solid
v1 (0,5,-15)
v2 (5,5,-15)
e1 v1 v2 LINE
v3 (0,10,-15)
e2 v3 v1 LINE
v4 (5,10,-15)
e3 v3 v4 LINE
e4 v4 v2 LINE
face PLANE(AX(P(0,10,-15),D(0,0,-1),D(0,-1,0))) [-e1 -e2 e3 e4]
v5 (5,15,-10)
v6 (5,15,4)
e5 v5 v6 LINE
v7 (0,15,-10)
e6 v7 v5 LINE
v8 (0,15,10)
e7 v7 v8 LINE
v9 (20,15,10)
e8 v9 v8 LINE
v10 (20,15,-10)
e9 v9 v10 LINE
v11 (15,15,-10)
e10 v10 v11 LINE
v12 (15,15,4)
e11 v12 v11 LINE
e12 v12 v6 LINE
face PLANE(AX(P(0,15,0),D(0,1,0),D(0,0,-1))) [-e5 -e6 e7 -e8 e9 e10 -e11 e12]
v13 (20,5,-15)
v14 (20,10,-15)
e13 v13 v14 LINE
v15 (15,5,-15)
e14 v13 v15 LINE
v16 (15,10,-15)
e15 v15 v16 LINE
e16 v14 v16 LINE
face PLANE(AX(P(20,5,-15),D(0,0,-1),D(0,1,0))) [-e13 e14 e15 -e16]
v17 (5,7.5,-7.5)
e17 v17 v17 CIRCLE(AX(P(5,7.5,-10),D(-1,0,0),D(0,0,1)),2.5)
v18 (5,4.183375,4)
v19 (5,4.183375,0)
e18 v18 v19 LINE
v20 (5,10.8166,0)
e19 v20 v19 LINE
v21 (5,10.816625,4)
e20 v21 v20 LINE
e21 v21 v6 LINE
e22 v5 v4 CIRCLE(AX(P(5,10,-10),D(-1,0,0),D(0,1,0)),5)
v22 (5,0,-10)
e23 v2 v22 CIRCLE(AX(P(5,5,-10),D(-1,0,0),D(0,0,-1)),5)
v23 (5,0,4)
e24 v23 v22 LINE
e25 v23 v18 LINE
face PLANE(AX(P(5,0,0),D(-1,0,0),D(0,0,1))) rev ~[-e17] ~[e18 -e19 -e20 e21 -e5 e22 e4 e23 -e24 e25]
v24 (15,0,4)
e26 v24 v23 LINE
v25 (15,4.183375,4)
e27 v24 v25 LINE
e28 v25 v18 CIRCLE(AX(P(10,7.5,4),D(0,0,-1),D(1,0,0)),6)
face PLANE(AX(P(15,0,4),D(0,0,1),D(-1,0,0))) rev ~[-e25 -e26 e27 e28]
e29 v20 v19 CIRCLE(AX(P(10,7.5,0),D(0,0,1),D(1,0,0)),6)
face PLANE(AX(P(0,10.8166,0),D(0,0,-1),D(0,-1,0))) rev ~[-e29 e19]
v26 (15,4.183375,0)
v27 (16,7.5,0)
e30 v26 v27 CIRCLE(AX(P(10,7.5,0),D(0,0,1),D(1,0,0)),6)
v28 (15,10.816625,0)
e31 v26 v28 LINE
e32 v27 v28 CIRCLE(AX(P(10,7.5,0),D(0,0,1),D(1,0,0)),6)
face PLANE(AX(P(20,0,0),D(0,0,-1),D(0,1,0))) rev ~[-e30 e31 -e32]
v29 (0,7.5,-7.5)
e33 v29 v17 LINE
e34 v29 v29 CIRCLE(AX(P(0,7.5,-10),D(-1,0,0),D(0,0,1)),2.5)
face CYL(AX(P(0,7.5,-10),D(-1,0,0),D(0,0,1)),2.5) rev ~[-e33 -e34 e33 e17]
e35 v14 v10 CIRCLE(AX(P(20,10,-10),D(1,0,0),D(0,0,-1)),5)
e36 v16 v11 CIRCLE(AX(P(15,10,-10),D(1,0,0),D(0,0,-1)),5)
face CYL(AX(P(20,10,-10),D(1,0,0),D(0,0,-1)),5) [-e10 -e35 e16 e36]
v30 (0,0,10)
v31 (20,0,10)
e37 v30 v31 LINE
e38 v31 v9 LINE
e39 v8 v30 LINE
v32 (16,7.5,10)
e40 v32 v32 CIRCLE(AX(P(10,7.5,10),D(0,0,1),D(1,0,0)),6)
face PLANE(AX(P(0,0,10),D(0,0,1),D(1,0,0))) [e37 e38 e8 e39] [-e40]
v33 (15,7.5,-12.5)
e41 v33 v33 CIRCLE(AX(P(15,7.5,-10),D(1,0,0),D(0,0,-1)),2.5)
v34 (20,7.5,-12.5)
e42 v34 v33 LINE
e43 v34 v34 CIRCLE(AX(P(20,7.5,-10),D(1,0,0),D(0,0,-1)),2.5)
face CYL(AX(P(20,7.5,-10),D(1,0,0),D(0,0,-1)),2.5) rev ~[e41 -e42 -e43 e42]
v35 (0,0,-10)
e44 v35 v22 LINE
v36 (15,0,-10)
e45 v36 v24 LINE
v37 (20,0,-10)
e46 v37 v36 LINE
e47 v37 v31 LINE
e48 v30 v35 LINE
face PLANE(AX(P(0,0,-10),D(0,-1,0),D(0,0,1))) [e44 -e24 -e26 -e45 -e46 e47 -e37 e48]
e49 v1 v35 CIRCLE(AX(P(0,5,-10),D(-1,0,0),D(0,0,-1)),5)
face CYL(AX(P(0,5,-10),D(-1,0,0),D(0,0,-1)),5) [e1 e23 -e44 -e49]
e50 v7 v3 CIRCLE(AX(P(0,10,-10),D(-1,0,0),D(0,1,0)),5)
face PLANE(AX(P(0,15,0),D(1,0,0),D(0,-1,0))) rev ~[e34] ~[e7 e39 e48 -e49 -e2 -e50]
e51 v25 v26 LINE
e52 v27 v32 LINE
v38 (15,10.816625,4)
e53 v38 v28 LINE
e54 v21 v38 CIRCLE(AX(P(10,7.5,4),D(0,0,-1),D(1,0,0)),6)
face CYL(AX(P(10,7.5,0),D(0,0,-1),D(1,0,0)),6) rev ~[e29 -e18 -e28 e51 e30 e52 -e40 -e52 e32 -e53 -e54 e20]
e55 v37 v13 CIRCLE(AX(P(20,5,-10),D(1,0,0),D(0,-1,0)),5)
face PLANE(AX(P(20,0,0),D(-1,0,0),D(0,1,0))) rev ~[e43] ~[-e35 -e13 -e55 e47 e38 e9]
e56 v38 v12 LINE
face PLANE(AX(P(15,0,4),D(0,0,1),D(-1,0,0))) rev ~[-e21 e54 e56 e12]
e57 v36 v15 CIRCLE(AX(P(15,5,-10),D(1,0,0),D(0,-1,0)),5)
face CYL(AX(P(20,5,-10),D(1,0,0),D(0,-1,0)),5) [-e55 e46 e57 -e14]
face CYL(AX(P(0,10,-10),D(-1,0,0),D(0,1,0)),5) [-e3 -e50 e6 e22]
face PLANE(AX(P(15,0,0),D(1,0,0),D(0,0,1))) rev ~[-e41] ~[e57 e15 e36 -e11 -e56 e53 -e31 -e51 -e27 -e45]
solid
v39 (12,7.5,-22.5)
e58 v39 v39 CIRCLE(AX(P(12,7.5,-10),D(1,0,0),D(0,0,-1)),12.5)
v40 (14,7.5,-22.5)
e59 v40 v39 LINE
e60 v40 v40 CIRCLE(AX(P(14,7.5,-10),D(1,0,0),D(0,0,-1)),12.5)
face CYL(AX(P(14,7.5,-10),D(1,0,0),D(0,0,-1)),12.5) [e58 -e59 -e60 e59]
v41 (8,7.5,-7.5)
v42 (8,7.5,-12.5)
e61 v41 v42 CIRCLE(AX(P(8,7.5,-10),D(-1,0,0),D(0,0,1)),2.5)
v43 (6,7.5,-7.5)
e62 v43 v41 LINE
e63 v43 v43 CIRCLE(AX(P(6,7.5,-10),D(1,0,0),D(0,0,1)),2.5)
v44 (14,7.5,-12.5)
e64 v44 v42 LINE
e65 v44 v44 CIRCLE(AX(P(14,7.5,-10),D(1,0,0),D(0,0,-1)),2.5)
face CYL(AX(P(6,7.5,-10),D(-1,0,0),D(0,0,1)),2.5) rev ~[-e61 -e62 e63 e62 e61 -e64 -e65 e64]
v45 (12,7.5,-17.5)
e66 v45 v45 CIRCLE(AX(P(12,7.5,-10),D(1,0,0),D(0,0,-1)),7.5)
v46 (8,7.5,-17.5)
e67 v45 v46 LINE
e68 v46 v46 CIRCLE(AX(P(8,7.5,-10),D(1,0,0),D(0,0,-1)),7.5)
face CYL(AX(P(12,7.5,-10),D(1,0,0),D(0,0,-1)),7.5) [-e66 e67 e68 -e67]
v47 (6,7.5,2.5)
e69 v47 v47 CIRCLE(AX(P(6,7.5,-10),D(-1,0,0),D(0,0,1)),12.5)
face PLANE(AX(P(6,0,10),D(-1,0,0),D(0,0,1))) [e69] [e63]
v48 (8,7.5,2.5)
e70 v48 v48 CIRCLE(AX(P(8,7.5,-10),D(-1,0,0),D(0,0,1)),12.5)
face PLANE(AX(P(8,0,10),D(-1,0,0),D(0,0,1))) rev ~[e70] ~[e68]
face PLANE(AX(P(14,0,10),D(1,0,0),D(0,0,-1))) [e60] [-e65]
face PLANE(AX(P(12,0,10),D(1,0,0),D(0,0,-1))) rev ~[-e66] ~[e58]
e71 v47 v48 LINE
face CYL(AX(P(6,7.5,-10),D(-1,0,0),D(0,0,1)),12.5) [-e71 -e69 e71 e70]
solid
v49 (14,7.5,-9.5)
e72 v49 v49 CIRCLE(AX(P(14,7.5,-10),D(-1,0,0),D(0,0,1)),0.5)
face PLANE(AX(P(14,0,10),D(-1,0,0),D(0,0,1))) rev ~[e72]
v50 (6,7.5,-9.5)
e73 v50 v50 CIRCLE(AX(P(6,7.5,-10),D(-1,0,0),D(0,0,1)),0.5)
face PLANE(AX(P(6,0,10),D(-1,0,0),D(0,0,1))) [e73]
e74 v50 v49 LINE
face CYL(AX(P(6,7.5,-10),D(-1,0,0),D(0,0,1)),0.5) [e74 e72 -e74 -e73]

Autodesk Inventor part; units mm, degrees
sketch "Boceto1" plane through (0, 0, 0) normal (0, 0, 1) x (1, 0, 0)
  line L0 (0, 0) -> (20, 0)
  line L1 (20, 0) -> (20, 15)
  line L2 (20, 15) -> (0, 15)
  line L3 (0, 15) -> (0, 0)
  circle A0 centre (10, 7.5) radius 6
  dimension "d0" = 20
  dimension "d1" = 15
  dimension "d3" = 12
extrude "Extrusión1" add sketch "Boceto1" along normal blind 10
sketch "Boceto2" plane through (20, 0, 0) normal (1, 0, 0) x (0, 0, -1)
  line L0 (0, 0) -> (10, 0)
  line L1 (15, 5) -> (15, 10)
  line L2 (0, 0) -> (0, 15) projected
  line L3 (10, 15) -> (0, 15)
  arc A0 (15, 10) -> (10, 15) centre (10, 10) ccw
  arc A1 (10, 0) -> (15, 5) centre (10, 5) ccw
  circle A2 centre (10, 7.5) radius 2.5
  point P0 (15, 0)
  point P1 (15, 15)
  dimension "d6" = 15
  dimension "d7" = 15
  dimension "d9" = 5
  dimension "d10" = 5
  dimension "d11" = 5
extrude "Extrusión2" add sketch "Boceto2" against normal blind 5
sketch "Boceto3" plane through (0, 0, 0) normal (-1, 0, 0) x (0, 0, 1)
  line L0 (0, 15) -> (0, 10.8166) projected
  line L1 (0, 15) -> (-10, 15)
  line L2 (-15, 10) -> (-15, 5)
  line L3 (-10, 0) -> (0, 0)
  arc A0 (-10, 15) -> (-15, 10) centre (-10, 10) ccw
  arc A1 (-15, 5) -> (-10, 0) centre (-10, 5) ccw
  circle A2 centre (-10, 7.5) radius 2.5
  line L4 (0, 15) -> (0, 0)
  point P0 (-10, 15)
  point P1 (-15, 15)
  dimension "d14" = 15
  dimension "d15" = 5
  dimension "d16" = 5
extrude "Extrusión3" add sketch "Boceto3" against normal blind 5
ref_plane "Plano de trabajo1" through (14, 0, 10) normal (1, 0, 0) x (0, 0, -1)
ref_plane "Plano de trabajo3" through (6, 0, 10) normal (-1, 0, 0) x (0, 0, 1)
sketch "Boceto7" plane through (0, 0, 10) normal (0, -1, 0) x (1, 0, 0)
  line L0 (5, -10) -> (15, -10) projected
  line L1 (5, -10) -> (15, -10)
  line L2 (15, -10) -> (15, -6)
  line L3 (15, -6) -> (5, -6)
  line L4 (5, -6) -> (5, -10)
  point P0 (0, -10)
  dimension "d31" = 10
  dimension "d32" = 4
extrude "Extrusión7" cut sketch "Boceto7" against normal blind 15
sketch "Boceto8" plane through (14, 0, 10) normal (1, 0, 0) x (0, 0, -1)
  circle A0 centre (20, 7.5) radius 2.5 projected
  circle A1 centre (20, 7.5) radius 12.5
  point P0 (10, 0)
  dimension "d35" = 25
extrude "Extrusión8" add sketch "Boceto8" against normal blind 2
ref_plane "Plano de trabajo4" through (12, 7.5, -10) normal (1, 0, 0) x (0, 0, -1)
sketch "Boceto9" plane through (12, 7.5, -10) normal (1, 0, 0) x (0, 0, -1)
  circle A0 centre (0, 0) radius 7.5
  point P0 (-10, -7.5)
  dimension "d39" = 15
extrude "Extrusión9" add sketch "Boceto9" against normal blind 4
sketch "Boceto10" plane through (6, 0, 10) normal (-1, 0, 0) x (0, 0, 1)
  circle A0 centre (-20, 7.5) radius 2.5 projected
  circle A1 centre (-20, 7.5) radius 12.5
  circle A2 centre (-20, 7.5) radius 0.5
  circle A3 centre (-20, 7.5) radius 1.5
  point P0 (-10, 0)
  dimension "d42" = 25
  dimension "d47" = 1
  dimension "d48" = 3
extrude "Extrusión10" add sketch "Boceto10" against normal blind 2 contours A1
sketch "Boceto11" plane through (12, 7.5, -10) normal (1, 0, 0) x (0, 0, -1)
  circle A0 centre (0, 0) radius 2.5
  point P0 (-10, -7.5)
extrude "Extrusión11" cut sketch "Boceto11" against normal blind 6
extrude "Extrusión12" add sketch "Boceto10" against normal blind 8 contours A2
properties part number "polea"
